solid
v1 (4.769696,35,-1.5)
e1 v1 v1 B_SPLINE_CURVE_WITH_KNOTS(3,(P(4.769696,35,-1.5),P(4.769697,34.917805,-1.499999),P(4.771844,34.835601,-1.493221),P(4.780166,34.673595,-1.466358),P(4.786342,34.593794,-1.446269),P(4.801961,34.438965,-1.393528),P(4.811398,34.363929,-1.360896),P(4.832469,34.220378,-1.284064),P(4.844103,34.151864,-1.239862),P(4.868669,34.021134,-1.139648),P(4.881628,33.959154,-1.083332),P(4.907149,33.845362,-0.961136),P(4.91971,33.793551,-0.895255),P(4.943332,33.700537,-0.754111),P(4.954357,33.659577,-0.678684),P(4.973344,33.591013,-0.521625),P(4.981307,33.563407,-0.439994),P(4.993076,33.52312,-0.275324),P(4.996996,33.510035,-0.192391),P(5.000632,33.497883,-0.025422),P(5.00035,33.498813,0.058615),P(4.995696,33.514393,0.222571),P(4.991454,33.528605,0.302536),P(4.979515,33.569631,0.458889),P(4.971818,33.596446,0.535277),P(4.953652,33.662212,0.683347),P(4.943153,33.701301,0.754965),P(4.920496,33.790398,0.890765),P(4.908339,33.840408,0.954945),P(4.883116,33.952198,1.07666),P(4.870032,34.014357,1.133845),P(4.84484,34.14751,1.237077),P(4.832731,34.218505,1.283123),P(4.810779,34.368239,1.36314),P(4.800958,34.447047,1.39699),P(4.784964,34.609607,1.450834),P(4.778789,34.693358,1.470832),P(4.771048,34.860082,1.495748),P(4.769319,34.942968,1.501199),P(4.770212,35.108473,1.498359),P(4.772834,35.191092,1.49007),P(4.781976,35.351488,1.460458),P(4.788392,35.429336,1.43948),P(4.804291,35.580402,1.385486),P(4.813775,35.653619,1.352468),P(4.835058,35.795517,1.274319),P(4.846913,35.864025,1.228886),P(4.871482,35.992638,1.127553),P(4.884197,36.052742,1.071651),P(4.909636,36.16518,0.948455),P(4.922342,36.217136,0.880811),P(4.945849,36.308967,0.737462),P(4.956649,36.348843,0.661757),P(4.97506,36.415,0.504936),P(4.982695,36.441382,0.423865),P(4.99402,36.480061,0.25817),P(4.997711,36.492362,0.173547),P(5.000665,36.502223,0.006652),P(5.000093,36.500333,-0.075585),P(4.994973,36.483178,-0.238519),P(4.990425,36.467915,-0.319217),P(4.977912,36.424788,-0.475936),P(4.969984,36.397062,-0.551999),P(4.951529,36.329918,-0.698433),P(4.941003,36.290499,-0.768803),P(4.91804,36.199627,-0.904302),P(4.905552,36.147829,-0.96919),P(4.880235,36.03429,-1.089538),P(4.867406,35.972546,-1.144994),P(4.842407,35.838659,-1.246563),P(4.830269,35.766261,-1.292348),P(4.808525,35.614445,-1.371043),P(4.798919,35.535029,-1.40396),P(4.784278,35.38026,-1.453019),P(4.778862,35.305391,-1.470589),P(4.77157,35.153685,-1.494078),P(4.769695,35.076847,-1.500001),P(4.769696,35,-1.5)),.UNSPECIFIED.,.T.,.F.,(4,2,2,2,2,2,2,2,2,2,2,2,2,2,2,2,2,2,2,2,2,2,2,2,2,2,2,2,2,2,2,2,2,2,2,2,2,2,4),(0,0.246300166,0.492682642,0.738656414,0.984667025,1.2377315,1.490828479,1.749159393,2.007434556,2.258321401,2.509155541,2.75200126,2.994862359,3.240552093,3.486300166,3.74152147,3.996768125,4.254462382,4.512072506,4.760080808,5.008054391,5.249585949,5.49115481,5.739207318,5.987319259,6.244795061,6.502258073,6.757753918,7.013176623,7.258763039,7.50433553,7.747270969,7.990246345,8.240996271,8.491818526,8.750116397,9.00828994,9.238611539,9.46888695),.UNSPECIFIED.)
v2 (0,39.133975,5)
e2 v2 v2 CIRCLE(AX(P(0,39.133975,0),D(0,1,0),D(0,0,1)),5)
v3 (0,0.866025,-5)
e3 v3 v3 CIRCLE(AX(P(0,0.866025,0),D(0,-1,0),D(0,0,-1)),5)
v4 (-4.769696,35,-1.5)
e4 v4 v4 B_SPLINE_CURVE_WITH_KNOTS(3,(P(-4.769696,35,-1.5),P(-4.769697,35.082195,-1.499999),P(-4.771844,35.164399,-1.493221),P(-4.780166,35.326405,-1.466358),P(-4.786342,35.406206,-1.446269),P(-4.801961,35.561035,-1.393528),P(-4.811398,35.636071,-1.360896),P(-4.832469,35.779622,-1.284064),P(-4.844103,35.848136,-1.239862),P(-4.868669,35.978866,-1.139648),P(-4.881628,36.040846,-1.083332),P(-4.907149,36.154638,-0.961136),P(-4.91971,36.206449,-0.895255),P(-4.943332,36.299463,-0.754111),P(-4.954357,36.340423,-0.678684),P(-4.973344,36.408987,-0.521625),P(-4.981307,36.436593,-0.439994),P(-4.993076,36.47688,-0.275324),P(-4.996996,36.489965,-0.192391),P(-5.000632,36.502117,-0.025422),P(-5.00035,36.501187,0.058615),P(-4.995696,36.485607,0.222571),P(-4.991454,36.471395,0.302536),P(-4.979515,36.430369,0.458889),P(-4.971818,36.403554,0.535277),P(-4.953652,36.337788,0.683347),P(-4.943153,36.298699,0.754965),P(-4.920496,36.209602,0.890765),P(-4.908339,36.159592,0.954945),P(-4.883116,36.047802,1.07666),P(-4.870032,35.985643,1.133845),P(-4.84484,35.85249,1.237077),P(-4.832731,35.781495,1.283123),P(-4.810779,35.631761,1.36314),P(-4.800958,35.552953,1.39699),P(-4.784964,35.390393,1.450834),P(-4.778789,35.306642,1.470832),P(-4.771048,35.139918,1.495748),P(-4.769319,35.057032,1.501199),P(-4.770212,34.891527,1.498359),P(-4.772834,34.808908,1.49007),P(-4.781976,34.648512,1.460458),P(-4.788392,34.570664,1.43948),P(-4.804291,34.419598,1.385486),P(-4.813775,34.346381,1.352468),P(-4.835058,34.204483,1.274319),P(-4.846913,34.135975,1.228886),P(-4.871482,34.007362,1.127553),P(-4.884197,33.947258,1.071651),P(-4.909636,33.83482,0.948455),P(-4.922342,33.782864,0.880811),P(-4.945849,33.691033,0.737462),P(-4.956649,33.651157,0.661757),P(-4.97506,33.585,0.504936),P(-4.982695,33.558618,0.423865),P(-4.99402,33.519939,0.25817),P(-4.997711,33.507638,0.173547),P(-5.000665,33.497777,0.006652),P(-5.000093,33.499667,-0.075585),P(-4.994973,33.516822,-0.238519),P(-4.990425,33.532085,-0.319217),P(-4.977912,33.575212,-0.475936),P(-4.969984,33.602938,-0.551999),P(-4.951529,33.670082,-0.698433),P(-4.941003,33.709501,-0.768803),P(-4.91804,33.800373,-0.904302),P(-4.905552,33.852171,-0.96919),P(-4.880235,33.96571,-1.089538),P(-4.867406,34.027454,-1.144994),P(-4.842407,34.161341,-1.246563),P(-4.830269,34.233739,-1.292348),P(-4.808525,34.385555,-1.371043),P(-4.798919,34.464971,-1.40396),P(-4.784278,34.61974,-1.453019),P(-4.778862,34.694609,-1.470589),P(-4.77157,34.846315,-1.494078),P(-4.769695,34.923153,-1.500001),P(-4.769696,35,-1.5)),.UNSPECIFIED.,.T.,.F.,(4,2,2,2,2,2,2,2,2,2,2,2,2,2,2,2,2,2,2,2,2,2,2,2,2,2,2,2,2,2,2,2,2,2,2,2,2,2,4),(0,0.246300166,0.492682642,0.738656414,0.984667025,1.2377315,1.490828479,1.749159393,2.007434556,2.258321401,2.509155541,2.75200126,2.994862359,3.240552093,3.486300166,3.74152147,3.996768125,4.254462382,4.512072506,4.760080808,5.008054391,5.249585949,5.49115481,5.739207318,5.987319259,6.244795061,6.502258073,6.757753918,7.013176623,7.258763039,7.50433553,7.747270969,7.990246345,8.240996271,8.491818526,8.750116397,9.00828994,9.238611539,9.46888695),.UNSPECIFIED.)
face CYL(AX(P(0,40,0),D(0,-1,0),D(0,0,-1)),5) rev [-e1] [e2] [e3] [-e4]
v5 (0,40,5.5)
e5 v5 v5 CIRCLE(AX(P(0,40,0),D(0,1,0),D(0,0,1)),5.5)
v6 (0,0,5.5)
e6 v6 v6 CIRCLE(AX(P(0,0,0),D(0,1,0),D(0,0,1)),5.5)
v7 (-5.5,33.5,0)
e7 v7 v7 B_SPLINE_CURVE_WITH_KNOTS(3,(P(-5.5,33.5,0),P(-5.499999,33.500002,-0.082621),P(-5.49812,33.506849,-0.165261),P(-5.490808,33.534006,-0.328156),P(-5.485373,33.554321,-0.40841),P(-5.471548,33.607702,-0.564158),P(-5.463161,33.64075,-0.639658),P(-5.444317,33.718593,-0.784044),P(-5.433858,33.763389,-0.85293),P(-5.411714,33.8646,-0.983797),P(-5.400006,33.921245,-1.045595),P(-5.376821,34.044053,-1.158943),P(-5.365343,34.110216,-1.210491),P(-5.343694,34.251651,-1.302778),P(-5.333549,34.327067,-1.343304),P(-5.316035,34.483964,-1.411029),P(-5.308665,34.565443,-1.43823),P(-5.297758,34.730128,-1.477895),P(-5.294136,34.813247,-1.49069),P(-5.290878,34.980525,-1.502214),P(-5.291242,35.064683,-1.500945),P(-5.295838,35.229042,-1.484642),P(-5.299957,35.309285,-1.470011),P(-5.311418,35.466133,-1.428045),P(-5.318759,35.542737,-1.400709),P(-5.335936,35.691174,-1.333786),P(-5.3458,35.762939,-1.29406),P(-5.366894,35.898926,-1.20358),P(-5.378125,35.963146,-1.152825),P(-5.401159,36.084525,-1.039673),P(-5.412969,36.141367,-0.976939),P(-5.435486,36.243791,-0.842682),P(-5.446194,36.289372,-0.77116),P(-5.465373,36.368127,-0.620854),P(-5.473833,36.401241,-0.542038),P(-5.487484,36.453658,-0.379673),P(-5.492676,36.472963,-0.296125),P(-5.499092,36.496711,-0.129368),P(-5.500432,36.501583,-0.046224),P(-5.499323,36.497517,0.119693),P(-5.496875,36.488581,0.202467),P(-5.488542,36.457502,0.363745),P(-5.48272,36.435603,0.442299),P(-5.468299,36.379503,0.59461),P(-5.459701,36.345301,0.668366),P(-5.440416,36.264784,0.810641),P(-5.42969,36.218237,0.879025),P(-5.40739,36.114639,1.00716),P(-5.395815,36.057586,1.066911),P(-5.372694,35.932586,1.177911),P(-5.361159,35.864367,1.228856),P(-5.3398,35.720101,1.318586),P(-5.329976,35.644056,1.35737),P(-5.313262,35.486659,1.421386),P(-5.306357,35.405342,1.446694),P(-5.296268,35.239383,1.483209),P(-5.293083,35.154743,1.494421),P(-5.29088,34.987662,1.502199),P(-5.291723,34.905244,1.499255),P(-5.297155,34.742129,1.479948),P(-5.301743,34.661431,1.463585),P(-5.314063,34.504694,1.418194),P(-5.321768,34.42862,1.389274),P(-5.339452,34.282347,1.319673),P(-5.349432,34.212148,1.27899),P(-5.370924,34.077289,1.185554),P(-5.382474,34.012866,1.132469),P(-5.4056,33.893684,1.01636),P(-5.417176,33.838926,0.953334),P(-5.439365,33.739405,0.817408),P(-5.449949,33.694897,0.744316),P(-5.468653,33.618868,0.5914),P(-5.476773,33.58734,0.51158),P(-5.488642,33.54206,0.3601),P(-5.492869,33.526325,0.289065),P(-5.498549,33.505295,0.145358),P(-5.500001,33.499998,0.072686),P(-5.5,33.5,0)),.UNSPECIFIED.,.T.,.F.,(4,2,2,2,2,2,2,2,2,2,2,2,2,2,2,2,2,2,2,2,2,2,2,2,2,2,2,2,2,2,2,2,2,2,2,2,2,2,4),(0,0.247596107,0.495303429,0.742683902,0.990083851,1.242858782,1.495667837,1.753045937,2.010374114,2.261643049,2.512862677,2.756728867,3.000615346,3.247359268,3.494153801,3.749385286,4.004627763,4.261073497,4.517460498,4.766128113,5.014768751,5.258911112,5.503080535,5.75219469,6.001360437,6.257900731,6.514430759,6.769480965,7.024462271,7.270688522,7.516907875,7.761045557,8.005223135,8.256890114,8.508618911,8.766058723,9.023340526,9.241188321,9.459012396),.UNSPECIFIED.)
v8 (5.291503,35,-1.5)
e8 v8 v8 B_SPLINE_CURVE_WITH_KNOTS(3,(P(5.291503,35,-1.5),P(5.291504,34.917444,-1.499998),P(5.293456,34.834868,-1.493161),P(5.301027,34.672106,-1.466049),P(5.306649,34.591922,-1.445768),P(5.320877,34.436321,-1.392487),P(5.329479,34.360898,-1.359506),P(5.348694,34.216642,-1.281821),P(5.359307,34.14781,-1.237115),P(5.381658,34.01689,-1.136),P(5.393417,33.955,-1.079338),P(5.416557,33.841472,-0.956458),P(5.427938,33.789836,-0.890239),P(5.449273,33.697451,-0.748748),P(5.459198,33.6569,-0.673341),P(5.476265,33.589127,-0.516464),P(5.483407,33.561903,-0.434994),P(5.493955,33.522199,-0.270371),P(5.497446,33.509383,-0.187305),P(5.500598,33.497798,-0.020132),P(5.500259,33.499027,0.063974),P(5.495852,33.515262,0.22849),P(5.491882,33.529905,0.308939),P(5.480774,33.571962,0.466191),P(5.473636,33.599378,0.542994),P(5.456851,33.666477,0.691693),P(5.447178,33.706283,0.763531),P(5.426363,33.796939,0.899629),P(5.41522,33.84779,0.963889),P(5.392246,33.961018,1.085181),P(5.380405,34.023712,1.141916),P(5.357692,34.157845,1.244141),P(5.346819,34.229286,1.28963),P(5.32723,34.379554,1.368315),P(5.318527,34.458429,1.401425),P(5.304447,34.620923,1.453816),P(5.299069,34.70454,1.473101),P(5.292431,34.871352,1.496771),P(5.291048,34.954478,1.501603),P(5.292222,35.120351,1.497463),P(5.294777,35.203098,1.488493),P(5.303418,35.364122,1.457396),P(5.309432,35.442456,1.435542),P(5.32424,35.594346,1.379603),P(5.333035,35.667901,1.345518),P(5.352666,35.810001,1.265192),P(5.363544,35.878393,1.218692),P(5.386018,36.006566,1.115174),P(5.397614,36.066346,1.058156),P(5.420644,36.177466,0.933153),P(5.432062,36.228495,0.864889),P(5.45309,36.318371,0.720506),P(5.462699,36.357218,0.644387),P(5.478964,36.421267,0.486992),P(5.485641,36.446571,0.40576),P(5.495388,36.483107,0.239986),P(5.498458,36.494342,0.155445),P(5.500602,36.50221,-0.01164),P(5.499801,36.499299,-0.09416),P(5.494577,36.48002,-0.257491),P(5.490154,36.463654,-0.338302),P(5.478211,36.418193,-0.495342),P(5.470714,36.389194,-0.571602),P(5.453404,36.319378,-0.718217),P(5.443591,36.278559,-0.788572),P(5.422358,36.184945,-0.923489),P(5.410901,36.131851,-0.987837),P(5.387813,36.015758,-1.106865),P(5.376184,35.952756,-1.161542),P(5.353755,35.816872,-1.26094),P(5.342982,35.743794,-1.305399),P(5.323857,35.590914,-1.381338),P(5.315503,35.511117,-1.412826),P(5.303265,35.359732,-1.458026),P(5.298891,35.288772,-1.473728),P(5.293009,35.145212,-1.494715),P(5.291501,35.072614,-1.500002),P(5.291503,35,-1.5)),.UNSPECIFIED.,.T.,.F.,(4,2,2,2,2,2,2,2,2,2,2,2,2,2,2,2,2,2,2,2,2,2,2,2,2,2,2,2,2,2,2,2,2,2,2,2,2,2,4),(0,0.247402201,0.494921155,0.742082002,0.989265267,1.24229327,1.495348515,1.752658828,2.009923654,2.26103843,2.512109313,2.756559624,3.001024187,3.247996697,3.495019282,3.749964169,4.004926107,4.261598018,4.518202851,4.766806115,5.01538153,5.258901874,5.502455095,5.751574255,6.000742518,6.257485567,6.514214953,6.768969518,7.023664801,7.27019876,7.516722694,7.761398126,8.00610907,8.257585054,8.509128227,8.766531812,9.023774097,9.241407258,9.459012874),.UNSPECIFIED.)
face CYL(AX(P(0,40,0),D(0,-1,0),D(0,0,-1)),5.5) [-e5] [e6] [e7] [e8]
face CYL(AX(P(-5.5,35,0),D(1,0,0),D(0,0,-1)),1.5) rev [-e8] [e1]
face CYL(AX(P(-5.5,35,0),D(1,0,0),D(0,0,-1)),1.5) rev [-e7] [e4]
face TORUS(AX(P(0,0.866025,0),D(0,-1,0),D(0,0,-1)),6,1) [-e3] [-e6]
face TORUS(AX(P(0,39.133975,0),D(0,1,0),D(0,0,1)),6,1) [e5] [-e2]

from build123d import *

# Parameters (mm, degrees)
SKETCH1_R               = 5.5
SKETCH1_R_2             = 4.999999999999999
BOSS_EXTRUDE1_DEPTH     = 40
FILLET1_R               = 1
FILLET2_R               = 1
CUT_EXTRUDE1_DEPTH      = 41.74923312161882
CUT_EXTRUDE1_DEPTH_BACK = 41.74923312161882
SKETCH2_R               = 1.5000000000000004


with BuildPart() as part:
    # Sketch1 → Boss-Extrude1 (new body)
    with BuildSketch(Plane(origin=(0, 0, 0), x_dir=(1, 0, 0), z_dir=(0, 1, 0))):
        with Locations(Location((0, 0, 0), (0, 0, 270))):
            Circle(SKETCH1_R)
        with Locations(Location((0, 0, 0), (0, 0, 270))):
            Circle(SKETCH1_R_2, mode=Mode.SUBTRACT)
    extrude(amount=BOSS_EXTRUDE1_DEPTH)

    # Fillet1
    # the kernel refuses this fillet: 1 mm, written as the material it takes off along each edge
    with BuildSketch(Plane(origin=(0, 40, 0), x_dir=(-1.8e-16, 0, 1), z_dir=(-1, 0, -1.8e-16))) as fillet1_piece_1:
        with BuildLine():
            CenterArc((5.999999999999999, -0.8660254037844908), FILLET1_R, 119.9999999999984, 60.00000000000159)
            Line((5.500000000000022, -3.553e-14), (5.490000000000022, 0.01732050807565599))
            ThreePointArc((5.490000000000022, 0.01732050807565599), (5.250000000000011, 0.02000000000000313), (4.999999999999999, 0.02000000000000313))
            Line((4.999999999999999, 0.02000000000000313), (4.9799999999999995, 0))
            Line((4.9799999999999995, 0), (4.9799999999999995, -0.8660254037844908))
            Line((4.9799999999999995, -0.8660254037844908), (4.999999999999999, -0.8660254037844908))
        make_face()
    revolve(axis=Axis((0, 40, 0), (0, 1, 0)), mode=Mode.SUBTRACT)

    # Fillet2
    # the kernel refuses this fillet: 1 mm, written as the material it takes off along each edge
    with BuildSketch(Plane(origin=(0, 0, 0), x_dir=(-1.8e-16, 0, 1), z_dir=(-1, 0, -1.8e-16))) as fillet2_piece_1:
        with BuildLine():
            CenterArc((5.999999999999999, 0.866025403784488), FILLET2_R, 180, 60.00000000000148)
            Line((4.999999999999999, 0.866025403784488), (4.9799999999999995, 0.866025403784488))
            Line((4.9799999999999995, 0.866025403784488), (4.9799999999999995, 0))
            Line((4.9799999999999995, 0), (4.999999999999999, -0.02))
            ThreePointArc((4.999999999999999, -0.02), (5.250000000000011, -0.02), (5.4900000000000215, -0.0173205080756525))
            Line((5.4900000000000215, -0.0173205080756525), (5.500000000000021, 3.653e-14))
        make_face()
    revolve(axis=Axis((0, 0, 0), (0, 1, 0)), mode=Mode.SUBTRACT)

    # Sketch2 → Cut-Extrude1 (cut, two sides: drawn at the far end of the back side and taken through both)
    with BuildSketch(Plane(origin=(0, 0, 0), x_dir=(0, 0, -1), z_dir=(1, 0, 0)).offset(-CUT_EXTRUDE1_DEPTH_BACK)):
        with Locations((0, 35)):
            Circle(SKETCH2_R)
    extrude(amount=CUT_EXTRUDE1_DEPTH + CUT_EXTRUDE1_DEPTH_BACK, mode=Mode.SUBTRACT)


solid = part.part
